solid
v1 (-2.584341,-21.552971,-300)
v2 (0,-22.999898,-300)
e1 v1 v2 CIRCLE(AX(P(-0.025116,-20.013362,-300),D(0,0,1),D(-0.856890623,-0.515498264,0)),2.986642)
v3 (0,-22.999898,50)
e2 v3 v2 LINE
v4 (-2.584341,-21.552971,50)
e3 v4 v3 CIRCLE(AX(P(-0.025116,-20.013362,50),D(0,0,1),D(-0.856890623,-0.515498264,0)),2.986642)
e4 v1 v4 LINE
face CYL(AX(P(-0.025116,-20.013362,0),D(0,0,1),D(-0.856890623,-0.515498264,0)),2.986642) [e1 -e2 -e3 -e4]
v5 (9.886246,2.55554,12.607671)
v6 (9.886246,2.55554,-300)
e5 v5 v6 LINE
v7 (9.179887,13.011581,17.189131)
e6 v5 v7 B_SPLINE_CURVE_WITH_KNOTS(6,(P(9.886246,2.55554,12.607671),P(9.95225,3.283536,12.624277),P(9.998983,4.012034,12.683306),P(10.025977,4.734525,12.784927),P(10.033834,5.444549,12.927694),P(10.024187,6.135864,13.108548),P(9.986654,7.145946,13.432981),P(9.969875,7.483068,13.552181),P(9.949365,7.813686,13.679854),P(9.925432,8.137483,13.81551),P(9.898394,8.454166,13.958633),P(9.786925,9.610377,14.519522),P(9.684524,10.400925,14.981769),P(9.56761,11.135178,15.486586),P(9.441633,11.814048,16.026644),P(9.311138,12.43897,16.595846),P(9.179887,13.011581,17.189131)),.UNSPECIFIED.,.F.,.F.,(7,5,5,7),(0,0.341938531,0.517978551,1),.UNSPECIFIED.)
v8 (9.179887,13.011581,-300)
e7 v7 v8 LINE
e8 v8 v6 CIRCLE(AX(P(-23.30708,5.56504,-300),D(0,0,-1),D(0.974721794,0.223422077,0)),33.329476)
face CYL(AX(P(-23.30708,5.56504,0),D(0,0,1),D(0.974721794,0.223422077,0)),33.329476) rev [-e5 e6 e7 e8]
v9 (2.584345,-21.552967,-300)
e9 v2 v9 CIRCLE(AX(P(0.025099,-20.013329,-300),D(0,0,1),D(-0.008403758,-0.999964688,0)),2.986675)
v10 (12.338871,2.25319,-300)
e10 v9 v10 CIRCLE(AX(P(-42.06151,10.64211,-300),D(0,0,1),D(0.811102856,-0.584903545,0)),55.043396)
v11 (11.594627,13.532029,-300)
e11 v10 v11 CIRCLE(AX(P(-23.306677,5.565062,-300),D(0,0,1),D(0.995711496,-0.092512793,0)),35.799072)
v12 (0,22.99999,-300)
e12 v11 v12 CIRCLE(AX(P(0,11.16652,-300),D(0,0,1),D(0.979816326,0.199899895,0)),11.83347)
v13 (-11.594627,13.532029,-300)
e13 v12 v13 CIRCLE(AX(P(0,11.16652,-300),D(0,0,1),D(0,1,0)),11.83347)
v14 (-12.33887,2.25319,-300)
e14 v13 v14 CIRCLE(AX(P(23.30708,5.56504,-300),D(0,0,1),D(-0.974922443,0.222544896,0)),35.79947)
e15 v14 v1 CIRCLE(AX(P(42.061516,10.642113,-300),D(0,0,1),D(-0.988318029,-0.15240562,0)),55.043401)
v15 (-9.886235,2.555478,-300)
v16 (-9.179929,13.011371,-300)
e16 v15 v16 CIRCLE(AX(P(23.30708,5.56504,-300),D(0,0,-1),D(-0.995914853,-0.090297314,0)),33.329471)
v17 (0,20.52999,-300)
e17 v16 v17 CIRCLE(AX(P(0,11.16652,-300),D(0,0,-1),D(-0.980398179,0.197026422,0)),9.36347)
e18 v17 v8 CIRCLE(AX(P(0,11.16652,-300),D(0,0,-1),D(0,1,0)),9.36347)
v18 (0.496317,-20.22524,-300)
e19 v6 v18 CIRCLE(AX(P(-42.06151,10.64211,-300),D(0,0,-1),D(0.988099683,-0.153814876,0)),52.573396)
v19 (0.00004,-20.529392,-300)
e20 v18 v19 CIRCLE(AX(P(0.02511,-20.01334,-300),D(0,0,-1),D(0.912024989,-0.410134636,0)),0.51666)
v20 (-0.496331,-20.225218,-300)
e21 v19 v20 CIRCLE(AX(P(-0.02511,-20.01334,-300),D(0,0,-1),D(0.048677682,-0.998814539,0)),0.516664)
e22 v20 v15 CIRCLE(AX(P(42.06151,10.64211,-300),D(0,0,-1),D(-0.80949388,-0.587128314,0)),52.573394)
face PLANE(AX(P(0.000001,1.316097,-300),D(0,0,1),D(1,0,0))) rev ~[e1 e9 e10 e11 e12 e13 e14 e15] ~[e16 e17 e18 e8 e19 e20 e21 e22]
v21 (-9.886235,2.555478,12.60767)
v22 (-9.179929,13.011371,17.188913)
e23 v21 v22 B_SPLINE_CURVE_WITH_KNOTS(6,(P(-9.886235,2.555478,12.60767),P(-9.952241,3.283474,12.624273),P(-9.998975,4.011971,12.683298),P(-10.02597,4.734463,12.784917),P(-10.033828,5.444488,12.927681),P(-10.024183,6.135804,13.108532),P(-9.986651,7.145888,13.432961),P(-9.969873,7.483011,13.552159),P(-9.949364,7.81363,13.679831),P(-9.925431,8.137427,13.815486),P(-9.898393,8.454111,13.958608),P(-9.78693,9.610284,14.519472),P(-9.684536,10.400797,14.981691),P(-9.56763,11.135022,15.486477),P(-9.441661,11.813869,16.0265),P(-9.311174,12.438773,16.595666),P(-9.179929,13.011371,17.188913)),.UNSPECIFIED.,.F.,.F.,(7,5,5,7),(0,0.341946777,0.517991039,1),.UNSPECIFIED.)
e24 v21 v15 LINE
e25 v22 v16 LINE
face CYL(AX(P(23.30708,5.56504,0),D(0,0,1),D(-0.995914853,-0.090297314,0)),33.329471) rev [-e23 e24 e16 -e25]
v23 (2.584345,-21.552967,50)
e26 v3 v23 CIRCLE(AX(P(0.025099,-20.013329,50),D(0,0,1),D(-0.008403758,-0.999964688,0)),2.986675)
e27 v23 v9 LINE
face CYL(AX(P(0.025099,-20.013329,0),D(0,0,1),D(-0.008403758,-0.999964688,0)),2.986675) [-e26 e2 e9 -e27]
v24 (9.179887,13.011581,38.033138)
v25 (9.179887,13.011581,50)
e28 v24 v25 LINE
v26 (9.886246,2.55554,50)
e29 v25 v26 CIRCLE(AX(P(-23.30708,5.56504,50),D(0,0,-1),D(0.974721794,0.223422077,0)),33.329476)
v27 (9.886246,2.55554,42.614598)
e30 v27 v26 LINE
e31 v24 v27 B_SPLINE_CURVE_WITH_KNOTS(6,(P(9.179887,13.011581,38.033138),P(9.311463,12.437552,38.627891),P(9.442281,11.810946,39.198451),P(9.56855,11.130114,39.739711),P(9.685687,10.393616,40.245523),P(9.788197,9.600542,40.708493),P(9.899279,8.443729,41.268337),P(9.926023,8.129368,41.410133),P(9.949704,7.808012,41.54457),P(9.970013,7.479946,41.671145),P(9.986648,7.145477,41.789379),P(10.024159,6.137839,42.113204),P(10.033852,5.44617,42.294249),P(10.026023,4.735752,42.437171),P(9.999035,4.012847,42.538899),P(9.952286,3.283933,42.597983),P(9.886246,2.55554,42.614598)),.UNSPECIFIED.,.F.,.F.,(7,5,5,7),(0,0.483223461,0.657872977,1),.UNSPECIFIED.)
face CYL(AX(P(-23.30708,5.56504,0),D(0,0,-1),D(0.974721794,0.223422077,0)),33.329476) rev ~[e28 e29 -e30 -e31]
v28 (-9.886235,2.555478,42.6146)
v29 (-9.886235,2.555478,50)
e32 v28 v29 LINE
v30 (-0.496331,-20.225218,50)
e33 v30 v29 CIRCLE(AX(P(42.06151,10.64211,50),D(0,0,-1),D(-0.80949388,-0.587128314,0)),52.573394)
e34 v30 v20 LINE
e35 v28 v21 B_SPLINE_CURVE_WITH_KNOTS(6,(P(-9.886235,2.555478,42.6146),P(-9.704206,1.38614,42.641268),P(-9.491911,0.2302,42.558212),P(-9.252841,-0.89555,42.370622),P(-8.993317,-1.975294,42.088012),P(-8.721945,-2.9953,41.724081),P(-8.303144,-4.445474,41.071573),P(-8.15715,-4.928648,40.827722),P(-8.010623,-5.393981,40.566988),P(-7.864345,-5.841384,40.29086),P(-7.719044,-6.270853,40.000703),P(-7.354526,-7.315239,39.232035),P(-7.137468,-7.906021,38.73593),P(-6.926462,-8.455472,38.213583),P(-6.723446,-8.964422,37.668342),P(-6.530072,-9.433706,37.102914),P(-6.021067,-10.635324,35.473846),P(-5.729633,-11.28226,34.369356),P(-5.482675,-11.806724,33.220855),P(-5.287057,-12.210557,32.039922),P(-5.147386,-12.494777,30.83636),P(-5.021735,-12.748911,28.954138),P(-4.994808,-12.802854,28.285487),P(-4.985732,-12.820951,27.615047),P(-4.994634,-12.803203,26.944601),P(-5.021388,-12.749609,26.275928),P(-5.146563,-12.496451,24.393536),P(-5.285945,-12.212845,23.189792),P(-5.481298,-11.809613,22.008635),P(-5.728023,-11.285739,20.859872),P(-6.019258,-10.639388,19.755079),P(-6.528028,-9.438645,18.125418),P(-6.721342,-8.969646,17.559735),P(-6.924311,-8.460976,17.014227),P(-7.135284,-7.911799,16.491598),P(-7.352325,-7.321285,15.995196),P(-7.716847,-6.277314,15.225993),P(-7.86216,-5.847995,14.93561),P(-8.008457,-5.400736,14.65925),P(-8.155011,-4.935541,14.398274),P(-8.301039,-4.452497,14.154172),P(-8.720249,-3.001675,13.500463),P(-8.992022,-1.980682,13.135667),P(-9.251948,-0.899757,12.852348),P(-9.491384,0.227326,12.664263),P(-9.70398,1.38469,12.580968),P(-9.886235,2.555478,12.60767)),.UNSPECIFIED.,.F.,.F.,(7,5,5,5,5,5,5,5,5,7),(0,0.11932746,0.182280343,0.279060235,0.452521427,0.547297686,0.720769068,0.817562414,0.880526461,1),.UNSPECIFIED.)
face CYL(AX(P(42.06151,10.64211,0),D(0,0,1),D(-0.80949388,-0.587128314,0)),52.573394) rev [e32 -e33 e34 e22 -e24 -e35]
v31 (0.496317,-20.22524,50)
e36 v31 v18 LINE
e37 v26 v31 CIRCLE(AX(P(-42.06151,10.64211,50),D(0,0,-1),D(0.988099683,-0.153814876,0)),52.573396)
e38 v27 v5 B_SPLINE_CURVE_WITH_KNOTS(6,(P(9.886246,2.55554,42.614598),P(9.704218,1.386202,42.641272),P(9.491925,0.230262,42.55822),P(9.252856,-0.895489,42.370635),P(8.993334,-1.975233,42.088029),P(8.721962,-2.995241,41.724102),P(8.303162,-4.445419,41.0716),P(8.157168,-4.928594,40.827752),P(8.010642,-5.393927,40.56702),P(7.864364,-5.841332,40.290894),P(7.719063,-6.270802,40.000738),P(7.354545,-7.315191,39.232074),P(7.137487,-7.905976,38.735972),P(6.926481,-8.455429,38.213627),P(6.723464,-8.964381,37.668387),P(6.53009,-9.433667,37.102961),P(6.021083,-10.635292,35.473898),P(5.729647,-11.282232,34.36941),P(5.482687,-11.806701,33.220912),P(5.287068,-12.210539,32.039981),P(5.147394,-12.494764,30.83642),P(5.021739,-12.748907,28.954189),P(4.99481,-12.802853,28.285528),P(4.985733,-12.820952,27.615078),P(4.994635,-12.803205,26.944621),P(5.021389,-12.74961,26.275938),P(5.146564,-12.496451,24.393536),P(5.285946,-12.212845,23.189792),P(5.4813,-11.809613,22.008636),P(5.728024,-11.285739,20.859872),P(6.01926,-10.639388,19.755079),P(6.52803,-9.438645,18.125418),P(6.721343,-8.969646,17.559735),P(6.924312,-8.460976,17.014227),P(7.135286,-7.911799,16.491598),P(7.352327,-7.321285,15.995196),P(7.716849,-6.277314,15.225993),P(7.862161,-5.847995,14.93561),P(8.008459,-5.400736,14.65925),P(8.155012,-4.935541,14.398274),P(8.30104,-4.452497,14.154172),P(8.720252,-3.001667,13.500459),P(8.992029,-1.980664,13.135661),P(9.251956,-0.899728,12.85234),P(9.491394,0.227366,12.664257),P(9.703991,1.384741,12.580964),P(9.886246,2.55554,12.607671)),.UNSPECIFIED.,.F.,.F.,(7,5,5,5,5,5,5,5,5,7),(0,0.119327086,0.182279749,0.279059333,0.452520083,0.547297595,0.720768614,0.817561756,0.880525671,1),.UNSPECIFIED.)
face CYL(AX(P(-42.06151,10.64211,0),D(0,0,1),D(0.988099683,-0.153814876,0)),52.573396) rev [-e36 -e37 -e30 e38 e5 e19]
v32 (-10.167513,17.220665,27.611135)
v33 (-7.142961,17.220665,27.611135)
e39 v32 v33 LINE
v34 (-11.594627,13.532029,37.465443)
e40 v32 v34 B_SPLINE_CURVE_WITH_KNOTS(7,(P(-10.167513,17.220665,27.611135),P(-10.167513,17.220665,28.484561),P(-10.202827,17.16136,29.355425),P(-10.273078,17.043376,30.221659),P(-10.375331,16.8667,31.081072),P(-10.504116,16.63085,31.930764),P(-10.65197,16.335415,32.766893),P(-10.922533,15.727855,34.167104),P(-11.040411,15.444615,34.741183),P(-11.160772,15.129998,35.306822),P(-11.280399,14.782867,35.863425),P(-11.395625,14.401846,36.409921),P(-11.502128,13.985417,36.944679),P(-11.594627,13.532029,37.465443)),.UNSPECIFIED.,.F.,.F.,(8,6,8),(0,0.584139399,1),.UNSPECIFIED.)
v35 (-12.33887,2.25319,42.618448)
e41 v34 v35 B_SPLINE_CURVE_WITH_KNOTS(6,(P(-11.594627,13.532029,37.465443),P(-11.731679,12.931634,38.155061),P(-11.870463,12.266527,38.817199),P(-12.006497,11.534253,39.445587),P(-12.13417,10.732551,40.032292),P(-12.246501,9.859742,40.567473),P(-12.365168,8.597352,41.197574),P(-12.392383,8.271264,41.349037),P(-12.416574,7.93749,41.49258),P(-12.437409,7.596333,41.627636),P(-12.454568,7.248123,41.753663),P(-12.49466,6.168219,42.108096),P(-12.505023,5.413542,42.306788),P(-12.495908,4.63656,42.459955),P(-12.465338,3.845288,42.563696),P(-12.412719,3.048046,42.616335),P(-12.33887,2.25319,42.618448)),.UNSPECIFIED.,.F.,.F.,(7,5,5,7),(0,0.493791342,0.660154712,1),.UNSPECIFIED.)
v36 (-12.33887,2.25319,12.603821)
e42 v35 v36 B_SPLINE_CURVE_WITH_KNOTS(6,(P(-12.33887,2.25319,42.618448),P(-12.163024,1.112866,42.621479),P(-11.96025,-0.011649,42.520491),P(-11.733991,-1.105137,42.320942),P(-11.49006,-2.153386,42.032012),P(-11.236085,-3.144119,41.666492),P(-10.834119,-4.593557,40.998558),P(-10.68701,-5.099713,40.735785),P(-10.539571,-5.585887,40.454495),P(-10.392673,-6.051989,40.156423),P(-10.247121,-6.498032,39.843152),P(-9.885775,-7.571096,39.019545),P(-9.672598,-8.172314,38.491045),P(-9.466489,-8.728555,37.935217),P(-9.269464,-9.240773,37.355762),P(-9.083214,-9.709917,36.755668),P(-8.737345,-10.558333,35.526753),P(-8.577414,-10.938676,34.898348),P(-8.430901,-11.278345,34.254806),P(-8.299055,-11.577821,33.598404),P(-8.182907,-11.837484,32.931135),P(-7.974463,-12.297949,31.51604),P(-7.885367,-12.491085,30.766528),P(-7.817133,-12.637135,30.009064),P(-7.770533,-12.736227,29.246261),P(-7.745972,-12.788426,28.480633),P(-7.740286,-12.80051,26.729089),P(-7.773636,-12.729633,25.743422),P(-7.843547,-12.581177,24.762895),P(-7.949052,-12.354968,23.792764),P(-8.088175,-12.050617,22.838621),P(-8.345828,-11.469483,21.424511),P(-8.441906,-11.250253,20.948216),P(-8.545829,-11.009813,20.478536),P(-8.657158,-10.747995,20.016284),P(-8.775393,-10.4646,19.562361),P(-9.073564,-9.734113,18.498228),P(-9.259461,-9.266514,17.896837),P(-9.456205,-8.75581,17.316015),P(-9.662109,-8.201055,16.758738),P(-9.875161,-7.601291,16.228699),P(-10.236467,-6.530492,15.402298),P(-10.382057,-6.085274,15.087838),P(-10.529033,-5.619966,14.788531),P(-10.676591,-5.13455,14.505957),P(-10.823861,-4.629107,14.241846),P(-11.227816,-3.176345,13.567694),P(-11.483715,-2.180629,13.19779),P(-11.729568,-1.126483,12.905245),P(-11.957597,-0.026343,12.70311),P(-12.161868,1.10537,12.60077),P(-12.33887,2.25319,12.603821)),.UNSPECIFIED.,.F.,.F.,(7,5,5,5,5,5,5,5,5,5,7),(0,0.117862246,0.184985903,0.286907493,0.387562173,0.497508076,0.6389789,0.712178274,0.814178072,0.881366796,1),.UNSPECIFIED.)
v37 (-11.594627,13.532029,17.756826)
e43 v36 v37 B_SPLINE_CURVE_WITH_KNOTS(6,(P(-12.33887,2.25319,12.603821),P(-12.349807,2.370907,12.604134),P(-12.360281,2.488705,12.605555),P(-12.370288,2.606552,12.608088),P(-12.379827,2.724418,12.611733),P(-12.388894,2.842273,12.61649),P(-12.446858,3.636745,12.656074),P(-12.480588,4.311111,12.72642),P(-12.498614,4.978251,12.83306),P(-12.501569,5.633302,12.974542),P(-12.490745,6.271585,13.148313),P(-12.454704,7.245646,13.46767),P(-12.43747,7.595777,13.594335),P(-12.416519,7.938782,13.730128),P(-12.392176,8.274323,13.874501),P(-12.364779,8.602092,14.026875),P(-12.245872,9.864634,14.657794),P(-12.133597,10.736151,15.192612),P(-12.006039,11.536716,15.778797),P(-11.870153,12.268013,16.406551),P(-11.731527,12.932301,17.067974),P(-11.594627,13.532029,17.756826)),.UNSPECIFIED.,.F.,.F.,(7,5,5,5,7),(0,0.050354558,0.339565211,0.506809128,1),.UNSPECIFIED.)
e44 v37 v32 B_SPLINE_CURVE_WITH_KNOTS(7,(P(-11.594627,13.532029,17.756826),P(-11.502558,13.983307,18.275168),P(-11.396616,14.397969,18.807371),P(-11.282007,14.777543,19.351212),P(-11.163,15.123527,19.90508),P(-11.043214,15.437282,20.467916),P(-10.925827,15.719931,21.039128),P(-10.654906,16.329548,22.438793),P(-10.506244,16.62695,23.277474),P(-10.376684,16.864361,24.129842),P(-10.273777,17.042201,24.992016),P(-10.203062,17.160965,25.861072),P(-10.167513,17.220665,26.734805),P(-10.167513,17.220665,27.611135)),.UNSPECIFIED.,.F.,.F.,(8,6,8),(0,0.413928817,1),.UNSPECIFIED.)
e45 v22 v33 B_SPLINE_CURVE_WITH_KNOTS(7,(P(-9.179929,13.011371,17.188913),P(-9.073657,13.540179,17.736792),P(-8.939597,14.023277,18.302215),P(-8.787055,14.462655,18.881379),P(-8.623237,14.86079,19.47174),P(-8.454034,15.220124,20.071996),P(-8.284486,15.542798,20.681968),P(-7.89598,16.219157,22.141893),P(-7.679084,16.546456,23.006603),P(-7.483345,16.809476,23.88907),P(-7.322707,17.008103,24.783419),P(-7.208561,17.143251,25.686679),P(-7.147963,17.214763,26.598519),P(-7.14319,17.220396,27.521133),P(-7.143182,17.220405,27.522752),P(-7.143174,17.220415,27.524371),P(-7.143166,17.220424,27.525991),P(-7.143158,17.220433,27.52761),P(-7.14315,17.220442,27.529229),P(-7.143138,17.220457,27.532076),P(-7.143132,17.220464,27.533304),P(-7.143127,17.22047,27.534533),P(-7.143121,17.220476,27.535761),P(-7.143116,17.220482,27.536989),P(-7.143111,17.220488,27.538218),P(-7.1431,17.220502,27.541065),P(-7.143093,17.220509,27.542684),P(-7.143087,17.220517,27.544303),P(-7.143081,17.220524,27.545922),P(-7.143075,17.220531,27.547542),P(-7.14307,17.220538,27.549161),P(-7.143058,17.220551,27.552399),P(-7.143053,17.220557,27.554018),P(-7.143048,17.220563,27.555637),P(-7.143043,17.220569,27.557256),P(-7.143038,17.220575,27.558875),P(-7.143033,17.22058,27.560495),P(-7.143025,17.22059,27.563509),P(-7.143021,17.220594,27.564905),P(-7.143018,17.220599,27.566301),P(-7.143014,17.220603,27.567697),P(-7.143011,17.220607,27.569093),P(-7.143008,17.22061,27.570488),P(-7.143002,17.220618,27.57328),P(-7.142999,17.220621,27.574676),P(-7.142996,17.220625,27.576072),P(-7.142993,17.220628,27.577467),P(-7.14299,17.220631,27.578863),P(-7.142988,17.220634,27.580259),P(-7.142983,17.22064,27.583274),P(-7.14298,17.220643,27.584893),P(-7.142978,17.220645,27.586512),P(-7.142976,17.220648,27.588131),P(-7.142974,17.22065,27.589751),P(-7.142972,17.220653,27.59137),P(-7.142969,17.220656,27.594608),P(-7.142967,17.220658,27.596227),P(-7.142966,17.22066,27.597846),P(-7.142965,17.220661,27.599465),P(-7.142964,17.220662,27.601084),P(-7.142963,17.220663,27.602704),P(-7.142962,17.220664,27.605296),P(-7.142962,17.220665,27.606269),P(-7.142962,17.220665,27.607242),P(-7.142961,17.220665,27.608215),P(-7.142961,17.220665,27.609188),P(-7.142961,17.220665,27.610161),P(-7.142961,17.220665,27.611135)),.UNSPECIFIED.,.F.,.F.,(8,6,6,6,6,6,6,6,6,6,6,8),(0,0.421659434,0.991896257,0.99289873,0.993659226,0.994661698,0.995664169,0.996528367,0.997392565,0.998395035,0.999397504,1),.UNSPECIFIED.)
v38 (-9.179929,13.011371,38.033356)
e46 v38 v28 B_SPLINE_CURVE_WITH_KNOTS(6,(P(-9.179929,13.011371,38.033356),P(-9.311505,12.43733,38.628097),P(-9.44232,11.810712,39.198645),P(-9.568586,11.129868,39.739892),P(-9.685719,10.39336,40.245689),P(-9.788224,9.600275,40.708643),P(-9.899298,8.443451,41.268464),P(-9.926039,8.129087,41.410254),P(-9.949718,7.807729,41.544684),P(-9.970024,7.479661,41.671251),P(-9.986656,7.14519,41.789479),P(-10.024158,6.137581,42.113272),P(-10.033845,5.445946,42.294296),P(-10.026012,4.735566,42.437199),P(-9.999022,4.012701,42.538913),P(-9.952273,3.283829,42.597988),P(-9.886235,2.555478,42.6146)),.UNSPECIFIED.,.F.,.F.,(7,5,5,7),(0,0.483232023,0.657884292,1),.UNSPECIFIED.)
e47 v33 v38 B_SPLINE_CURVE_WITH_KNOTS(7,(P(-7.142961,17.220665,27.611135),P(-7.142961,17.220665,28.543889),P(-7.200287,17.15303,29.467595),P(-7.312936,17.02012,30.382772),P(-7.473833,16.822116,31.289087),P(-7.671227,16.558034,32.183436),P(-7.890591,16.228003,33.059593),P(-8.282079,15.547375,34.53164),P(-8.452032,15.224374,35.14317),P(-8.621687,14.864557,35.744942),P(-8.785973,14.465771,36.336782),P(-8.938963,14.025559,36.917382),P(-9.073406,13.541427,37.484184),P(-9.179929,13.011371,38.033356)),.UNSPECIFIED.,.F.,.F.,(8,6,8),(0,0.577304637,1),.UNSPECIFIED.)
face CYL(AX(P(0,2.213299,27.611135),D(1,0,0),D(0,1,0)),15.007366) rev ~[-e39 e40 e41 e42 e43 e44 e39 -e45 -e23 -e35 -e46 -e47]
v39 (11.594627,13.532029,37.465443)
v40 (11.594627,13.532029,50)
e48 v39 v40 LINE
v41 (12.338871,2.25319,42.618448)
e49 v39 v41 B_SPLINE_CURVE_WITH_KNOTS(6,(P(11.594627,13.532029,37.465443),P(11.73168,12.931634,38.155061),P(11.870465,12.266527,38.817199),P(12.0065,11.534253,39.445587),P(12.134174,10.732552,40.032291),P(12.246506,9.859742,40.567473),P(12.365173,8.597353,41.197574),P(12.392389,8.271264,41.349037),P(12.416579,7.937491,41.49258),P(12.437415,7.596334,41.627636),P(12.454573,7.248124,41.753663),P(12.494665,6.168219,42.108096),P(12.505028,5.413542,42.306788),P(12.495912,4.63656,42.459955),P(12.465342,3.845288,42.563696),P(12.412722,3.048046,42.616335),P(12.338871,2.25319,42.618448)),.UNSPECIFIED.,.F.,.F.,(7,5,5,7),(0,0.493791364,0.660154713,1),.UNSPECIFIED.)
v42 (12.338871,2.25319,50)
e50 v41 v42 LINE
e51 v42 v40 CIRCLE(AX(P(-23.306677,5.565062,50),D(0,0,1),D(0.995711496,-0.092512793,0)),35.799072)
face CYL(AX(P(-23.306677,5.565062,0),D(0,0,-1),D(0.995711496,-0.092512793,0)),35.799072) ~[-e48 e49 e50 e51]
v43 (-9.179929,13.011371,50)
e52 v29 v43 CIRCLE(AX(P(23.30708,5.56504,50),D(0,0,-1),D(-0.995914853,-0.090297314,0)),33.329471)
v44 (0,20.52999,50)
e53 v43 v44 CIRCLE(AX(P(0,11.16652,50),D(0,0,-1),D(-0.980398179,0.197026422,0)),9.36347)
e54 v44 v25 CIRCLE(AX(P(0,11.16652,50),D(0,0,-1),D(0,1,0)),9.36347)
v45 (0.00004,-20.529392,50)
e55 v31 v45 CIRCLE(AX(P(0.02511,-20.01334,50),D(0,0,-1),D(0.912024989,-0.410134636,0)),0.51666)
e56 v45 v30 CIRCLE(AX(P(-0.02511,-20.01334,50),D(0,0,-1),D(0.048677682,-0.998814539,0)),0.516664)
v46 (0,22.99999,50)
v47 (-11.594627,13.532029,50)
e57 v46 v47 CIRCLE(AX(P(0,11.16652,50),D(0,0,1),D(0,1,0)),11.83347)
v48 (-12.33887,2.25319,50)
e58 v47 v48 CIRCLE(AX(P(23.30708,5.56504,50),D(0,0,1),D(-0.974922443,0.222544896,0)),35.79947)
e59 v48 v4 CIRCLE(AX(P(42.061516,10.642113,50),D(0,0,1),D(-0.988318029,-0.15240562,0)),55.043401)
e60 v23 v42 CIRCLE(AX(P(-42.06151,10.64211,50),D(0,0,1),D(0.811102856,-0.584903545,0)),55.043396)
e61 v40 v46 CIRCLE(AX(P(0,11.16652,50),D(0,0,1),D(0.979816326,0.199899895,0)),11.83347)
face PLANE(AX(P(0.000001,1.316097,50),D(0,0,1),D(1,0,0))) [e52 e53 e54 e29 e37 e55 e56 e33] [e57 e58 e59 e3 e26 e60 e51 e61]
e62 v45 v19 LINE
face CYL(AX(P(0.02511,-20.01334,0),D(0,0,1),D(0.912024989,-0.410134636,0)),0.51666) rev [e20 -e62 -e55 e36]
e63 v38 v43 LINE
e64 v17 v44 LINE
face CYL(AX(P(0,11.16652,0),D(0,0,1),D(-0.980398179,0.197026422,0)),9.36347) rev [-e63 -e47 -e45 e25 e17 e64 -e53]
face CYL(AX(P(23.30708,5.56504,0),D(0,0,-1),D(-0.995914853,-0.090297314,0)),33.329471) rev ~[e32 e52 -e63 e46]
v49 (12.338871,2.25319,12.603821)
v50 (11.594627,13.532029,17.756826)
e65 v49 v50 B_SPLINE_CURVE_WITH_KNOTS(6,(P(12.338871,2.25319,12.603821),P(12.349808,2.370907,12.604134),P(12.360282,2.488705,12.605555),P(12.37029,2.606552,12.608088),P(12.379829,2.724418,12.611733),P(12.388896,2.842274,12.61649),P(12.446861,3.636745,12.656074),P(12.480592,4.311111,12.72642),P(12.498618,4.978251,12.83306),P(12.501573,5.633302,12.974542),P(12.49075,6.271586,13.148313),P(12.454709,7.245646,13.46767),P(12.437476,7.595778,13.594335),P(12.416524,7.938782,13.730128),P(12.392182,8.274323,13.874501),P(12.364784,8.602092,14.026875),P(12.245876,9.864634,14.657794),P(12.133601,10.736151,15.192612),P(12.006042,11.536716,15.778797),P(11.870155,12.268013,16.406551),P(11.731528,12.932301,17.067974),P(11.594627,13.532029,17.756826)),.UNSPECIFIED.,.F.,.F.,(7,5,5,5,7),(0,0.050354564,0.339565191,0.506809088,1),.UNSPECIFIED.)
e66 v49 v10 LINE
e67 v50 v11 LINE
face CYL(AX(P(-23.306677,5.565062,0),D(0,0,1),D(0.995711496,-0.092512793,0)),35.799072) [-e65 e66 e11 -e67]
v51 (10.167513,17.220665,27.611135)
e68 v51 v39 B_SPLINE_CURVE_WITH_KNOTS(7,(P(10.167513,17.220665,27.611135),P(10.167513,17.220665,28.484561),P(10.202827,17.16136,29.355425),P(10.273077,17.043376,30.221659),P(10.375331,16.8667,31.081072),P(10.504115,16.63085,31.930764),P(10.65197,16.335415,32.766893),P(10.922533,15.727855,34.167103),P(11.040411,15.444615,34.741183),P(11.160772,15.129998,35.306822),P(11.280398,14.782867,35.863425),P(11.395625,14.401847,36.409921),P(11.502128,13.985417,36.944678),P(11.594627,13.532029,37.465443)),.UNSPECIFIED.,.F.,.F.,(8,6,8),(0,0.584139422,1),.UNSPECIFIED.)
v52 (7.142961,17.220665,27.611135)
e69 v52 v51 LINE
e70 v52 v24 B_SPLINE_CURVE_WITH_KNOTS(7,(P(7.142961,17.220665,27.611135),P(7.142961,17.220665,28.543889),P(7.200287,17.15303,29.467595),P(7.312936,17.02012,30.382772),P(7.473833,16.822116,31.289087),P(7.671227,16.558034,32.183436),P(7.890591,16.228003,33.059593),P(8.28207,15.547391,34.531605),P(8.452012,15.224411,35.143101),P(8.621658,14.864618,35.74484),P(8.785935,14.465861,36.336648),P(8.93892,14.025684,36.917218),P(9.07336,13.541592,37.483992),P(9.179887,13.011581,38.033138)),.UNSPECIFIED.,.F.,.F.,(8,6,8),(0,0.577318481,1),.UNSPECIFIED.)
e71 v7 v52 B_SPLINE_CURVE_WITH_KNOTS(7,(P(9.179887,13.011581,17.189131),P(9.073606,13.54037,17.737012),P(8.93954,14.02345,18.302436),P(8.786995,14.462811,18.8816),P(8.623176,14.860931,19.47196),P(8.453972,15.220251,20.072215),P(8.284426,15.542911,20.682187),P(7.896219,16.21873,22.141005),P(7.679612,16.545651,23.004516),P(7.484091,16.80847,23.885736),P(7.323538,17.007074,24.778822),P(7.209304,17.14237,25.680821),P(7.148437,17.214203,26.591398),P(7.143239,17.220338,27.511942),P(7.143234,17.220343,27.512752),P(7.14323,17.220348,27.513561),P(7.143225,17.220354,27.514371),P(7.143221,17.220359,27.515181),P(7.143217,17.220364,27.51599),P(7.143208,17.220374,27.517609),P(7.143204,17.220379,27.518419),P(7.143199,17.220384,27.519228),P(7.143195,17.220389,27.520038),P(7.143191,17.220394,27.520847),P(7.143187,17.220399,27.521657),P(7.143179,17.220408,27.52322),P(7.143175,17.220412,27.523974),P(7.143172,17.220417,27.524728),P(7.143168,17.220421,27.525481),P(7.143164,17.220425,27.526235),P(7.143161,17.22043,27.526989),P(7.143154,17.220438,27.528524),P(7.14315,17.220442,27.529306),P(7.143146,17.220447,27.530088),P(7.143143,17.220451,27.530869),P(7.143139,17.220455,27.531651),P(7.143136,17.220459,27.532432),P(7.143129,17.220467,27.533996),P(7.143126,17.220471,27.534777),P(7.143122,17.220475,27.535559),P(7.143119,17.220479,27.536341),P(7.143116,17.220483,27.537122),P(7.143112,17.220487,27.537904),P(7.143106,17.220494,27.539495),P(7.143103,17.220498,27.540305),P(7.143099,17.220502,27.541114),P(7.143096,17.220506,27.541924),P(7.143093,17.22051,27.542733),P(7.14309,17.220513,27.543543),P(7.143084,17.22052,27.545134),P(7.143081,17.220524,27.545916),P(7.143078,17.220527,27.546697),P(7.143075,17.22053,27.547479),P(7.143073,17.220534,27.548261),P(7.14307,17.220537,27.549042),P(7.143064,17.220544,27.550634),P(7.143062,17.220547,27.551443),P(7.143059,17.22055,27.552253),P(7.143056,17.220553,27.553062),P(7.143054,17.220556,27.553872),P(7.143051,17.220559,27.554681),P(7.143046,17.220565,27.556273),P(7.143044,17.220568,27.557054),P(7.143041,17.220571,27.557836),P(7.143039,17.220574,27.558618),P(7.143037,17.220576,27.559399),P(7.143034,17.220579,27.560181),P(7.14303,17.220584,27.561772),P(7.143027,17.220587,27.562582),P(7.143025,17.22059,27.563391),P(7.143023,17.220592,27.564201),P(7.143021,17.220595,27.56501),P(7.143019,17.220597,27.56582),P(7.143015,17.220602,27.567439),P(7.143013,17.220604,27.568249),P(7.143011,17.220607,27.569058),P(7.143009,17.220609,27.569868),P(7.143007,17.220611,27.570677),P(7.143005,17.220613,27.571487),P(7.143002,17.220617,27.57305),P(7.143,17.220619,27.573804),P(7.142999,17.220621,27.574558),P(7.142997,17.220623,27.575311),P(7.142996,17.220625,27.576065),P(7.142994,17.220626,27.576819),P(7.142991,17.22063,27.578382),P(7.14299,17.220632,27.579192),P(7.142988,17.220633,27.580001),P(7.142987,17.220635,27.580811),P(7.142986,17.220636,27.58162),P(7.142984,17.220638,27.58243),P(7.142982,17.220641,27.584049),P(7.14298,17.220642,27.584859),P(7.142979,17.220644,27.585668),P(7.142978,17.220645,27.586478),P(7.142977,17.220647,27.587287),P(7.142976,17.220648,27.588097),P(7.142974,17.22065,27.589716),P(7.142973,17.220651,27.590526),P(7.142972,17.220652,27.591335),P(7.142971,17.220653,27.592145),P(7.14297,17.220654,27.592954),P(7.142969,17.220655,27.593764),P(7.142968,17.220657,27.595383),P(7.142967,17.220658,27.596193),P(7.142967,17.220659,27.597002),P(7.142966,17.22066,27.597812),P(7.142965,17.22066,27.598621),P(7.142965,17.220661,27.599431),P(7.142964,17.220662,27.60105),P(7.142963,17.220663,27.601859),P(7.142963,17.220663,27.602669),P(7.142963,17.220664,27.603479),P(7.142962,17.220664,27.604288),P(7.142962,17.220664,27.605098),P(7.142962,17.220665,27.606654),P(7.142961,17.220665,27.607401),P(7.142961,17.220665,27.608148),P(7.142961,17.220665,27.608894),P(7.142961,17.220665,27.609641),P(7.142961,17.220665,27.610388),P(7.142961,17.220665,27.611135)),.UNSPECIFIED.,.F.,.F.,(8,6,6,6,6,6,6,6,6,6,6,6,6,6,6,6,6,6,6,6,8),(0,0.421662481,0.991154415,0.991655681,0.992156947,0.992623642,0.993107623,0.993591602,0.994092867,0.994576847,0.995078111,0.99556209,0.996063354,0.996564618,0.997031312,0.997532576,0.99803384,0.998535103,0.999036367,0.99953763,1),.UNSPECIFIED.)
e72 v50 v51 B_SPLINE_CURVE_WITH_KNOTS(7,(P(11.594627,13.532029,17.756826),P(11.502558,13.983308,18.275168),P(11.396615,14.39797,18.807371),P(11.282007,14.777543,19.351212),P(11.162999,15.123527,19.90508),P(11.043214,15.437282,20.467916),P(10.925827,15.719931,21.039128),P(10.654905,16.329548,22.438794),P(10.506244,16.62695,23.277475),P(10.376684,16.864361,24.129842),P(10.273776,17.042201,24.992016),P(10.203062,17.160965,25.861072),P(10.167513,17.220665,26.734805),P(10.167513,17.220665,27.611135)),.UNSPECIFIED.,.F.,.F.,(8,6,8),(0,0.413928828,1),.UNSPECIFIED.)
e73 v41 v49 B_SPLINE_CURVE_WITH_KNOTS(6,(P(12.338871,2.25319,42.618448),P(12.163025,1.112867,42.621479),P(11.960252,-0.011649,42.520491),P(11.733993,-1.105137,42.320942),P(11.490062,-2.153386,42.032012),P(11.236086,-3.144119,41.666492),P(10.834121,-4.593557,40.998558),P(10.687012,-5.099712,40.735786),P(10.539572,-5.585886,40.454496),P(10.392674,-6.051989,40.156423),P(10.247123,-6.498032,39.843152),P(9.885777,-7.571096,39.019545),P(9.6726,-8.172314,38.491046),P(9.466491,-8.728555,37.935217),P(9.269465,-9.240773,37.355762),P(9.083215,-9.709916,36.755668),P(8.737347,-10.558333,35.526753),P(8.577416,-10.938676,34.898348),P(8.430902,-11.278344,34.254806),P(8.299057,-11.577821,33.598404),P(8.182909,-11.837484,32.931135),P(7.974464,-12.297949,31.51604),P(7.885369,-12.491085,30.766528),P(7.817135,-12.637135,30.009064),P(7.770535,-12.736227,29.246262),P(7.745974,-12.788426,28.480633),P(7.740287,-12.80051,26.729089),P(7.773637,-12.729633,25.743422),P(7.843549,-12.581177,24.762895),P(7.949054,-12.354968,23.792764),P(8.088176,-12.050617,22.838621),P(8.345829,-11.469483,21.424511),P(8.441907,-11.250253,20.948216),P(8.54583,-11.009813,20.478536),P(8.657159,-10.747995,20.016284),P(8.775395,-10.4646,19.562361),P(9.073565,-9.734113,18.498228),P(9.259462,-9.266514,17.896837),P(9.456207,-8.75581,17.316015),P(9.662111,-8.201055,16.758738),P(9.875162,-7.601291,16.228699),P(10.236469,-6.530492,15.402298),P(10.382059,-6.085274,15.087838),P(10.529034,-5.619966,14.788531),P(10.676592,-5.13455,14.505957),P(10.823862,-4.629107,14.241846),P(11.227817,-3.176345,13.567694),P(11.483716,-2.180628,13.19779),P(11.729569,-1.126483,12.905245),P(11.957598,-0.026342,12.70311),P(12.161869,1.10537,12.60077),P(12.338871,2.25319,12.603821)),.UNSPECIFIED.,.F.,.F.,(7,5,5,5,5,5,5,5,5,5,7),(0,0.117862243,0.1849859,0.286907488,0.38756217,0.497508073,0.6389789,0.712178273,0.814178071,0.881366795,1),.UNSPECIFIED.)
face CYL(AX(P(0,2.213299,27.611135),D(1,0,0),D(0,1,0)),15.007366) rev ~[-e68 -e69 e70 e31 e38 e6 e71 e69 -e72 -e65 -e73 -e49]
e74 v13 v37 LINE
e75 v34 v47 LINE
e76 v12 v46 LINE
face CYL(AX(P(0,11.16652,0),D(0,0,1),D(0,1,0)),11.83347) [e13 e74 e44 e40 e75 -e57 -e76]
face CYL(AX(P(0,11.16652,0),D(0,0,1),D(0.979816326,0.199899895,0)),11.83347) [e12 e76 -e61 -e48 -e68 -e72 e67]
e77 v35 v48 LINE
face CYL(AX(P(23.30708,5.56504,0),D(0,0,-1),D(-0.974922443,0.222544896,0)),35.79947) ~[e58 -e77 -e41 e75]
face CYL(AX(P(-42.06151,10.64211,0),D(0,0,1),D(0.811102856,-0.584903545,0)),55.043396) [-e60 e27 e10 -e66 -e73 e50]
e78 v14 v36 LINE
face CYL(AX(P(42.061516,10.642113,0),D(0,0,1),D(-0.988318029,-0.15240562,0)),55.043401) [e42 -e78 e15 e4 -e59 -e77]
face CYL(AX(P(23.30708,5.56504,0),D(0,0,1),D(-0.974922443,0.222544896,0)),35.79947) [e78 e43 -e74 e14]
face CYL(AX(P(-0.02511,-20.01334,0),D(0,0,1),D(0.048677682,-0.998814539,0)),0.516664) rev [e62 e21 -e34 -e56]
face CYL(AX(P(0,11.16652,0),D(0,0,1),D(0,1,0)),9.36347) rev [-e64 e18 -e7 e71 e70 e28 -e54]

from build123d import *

# Parameters (mm, degrees)
F1_DEPTH = 50
F2_R     = 15.0073664172
F3_DEPTH = 25
F4_DEPTH = 300


# Not quite as in the source:
# - ends of sketch curves that miss each other by under 0.0002 mm in the source are joined


with BuildPart() as f1:
    # F0 (on Top) → F1 (new body)
    with BuildSketch(Plane.XY):
        with BuildLine():
            ThreePointArc((11.5946267397, 13.5320293348), (7.4846115717, 20.3323038327), (0, 22.9999896369))
            ThreePointArc((0, 22.9999896369), (-7.4846118013, 20.3323037509), (-11.5946270955, 13.5320290443))
            ThreePointArc((-11.5946270955, 13.5320290443), (-12.4147063987, 7.922168163), (-12.3388696742, 2.2531896672))
            ThreePointArc((-12.3388696742, 2.2531896672), (-8.8719983331, -10.2277960598), (-2.5843411657, -21.5529706895))
            ThreePointArc((-2.5843411657, -21.5529706895), (-1.4841666884, -22.619355112), (7e-08, -22.9998983316))
            ThreePointArc((7e-08, -22.9998983316), (1.4841670374, -22.6193504592), (2.5843454149, -21.5529672416))
            ThreePointArc((2.5843454149, -21.5529672416), (8.872000694, -10.2277939953), (12.3388707315, 2.2531898872))
            ThreePointArc((12.3388707315, 2.2531898872), (12.4147117976, 7.9221688824), (11.5946267397, 13.5320293348))
        make_face()
        with BuildLine():
            ThreePointArc((0, 20.5299898954), (5.9328912698, 18.410508519), (9.1798866708, 13.011580756))
            ThreePointArc((9.1798866708, 13.011580756), (9.9466025789, 7.8114966866), (9.8862458377, 2.5555396209))
            ThreePointArc((9.8862458377, 2.5555396209), (6.5447373666, -9.3927265107), (0.4963170659, -20.2252402669))
            ThreePointArc((0.4963170659, -20.2252402669), (0.2950851675, -20.4538524641), (4.0013e-05, -20.529391662))
            ThreePointArc((4.0013e-05, -20.529391662), (-0.2950640986, -20.4538699373), (-0.4963311707, -20.2252183832))
            ThreePointArc((-0.4963311707, -20.2252183832), (-6.5447290925, -9.3927429052), (-9.8862348466, 2.5554779538))
            ThreePointArc((-9.8862348466, 2.5554779538), (-9.9466064803, 7.8113582927), (-9.1799291893, 13.0113706774))
            ThreePointArc((-9.1799291893, 13.0113706774), (-5.9329742724, 18.4104406446), (0, 20.5299898954))
        make_face(mode=Mode.SUBTRACT)
    extrude(amount=F1_DEPTH)

    # F2 (on Right) → F3 (cut, symmetric)
    with BuildSketch(Plane.YZ):
        with Locations((2.2132990416, 27.6111345738)):
            Circle(F2_R)
    extrude(amount=F3_DEPTH, both=True, mode=Mode.SUBTRACT)

    # F4 (add): a face of the model
    f4_faces = [f1.faces().sort_by_distance(p)[0] for p in [
        (7.153517518, 19.9268403702, 0),
    ]]
    extrude(f4_faces, amount=F4_DEPTH)


solid = f1.part
